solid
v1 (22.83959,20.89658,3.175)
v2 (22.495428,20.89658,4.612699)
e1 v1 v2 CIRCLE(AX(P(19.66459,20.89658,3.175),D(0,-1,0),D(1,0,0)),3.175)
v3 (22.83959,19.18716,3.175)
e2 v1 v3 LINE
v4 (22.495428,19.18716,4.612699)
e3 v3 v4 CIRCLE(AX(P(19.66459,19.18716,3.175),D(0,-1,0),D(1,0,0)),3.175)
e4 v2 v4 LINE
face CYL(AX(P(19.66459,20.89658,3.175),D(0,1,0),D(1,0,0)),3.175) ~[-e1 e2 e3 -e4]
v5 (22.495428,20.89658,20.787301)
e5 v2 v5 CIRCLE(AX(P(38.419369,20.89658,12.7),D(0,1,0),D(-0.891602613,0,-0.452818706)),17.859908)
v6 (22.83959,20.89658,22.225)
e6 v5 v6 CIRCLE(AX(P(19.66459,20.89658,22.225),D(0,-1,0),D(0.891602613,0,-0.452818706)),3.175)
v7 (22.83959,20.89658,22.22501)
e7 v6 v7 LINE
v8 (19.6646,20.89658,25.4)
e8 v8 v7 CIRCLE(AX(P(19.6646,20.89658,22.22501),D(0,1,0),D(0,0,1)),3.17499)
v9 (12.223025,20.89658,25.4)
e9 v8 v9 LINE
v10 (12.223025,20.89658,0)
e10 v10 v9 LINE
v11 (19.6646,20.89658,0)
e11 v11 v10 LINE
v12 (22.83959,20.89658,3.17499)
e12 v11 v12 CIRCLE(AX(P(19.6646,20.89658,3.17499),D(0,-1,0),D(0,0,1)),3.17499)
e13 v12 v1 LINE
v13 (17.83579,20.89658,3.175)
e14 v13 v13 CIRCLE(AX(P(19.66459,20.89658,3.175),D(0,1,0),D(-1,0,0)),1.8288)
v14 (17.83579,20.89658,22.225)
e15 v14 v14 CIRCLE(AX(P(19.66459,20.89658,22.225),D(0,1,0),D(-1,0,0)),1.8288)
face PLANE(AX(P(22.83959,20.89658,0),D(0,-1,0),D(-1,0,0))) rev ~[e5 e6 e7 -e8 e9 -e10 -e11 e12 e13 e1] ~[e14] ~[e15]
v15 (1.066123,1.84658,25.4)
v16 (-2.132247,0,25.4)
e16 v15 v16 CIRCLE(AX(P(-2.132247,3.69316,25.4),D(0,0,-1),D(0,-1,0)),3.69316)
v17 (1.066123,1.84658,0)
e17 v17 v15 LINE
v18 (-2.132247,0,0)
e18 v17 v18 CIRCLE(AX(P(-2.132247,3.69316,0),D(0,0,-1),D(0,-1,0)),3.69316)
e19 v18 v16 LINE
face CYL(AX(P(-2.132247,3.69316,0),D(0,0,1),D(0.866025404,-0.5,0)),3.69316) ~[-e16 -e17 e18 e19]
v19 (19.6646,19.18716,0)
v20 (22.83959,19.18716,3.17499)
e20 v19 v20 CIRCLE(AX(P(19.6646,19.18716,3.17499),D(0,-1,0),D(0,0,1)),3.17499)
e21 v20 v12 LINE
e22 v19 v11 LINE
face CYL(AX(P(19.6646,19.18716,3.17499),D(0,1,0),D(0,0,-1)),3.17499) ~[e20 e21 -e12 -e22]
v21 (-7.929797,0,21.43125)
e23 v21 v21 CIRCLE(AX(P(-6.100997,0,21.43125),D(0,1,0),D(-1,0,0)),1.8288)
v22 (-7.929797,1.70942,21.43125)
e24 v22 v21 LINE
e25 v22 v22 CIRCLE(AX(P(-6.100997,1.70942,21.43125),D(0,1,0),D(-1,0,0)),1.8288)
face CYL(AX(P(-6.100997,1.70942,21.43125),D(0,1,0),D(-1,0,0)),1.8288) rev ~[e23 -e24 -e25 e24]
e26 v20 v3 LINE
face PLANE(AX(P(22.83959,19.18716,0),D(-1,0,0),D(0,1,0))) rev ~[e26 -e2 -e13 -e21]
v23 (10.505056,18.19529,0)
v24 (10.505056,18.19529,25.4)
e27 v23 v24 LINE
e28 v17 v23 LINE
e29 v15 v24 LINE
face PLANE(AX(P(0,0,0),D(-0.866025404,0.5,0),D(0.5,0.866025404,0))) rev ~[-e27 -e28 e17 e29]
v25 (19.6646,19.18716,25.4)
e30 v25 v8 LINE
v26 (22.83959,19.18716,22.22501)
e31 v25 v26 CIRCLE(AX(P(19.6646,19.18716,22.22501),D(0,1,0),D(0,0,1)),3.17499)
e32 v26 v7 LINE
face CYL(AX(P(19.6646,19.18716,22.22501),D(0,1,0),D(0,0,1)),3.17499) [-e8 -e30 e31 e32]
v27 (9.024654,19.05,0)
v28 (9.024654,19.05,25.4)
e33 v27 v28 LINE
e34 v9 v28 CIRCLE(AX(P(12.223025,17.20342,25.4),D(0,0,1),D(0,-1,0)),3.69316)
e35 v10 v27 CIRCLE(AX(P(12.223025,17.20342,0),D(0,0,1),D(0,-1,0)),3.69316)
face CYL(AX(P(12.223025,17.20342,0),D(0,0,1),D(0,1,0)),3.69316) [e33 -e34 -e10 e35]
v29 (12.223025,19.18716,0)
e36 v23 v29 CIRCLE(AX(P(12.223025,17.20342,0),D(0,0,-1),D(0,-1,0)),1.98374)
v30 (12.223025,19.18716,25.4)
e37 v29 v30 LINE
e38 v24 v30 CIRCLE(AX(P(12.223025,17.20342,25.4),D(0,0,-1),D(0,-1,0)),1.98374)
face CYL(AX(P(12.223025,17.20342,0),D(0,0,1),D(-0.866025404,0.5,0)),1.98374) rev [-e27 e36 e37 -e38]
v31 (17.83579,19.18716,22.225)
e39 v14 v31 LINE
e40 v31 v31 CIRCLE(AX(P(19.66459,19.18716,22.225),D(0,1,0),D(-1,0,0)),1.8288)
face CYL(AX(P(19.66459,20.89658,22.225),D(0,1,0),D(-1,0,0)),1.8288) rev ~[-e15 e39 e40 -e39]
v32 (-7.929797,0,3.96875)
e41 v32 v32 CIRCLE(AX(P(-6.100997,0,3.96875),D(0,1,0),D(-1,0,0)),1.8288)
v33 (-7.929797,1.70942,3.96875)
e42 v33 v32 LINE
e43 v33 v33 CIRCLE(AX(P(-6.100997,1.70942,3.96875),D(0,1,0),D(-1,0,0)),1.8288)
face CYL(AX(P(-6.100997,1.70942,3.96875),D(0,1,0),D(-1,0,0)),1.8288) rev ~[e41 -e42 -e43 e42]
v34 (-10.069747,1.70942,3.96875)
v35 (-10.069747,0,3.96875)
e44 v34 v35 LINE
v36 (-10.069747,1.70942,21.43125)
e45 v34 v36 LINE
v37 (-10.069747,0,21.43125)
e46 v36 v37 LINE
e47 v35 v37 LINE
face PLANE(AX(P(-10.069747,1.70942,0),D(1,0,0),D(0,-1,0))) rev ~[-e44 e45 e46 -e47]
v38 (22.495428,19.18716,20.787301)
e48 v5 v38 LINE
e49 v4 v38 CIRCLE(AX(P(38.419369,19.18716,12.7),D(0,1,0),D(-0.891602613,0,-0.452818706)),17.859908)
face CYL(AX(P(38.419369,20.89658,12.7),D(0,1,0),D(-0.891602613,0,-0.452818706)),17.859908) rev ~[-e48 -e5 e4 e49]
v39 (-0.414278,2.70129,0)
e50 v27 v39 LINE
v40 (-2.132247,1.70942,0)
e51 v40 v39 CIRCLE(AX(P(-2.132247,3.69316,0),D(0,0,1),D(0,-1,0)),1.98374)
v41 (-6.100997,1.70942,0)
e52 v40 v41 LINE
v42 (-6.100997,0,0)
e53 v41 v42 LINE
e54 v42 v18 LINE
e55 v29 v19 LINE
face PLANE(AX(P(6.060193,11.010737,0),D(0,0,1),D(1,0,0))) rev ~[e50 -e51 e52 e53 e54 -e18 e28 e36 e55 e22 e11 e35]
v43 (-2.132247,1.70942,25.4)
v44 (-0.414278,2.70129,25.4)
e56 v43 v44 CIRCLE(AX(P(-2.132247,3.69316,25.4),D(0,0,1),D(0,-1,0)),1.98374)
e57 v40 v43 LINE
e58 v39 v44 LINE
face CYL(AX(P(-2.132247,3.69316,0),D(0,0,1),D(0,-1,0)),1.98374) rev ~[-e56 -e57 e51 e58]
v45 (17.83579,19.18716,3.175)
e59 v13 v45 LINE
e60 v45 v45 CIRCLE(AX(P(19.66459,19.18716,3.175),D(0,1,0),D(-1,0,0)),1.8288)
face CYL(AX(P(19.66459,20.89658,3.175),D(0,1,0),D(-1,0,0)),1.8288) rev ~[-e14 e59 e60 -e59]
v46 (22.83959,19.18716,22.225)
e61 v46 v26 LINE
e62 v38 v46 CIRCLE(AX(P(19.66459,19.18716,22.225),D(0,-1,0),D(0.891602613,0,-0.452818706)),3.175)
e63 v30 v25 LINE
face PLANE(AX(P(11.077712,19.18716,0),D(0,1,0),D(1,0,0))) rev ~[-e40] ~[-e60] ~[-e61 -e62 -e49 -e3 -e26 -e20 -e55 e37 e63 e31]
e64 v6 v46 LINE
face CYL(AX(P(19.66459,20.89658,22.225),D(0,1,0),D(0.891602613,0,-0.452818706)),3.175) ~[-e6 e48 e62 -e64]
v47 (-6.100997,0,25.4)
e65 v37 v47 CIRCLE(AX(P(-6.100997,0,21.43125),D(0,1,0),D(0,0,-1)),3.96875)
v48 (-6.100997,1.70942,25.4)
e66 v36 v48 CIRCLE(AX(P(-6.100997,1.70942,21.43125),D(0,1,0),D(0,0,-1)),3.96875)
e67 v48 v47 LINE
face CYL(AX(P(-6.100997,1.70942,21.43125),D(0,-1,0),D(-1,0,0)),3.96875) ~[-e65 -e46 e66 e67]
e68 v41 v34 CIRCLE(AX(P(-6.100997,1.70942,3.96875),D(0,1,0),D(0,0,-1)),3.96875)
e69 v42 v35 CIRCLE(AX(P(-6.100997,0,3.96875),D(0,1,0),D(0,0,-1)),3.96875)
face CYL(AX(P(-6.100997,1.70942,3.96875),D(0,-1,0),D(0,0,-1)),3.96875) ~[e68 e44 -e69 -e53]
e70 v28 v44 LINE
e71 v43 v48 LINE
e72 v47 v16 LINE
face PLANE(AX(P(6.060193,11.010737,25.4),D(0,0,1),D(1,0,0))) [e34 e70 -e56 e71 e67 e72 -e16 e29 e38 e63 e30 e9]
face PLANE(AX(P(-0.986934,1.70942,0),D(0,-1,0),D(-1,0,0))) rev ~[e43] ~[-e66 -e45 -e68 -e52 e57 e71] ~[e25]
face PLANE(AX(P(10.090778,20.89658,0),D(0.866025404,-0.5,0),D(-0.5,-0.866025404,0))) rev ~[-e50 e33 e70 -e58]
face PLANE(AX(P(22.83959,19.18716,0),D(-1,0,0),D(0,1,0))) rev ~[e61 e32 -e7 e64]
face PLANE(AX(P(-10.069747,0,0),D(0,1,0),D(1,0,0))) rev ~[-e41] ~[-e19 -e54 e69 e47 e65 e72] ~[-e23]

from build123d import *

# Parameters (mm, degrees)
F1_DEPTH = 25.4
F2_R     = 1.8288
F3_DEPTH = 1.70942
F4_R     = 1.98374
F5_R     = 3.69316
F6_R     = 3.17499
F7_R     = 3.96875
F8_R     = 1.8288
F9_DEPTH = 1.70942


# Not quite as in the source:
# - a fillet or chamfer is up to 0.001 mm smaller than in the source, because OpenCascade refuses the exact size


with BuildPart() as f1:
    # F0 (on Top) → F1 (new body)
    with BuildSketch(Plane.XY):
        Polygon((-10.0697469202, 0), (0, 0), (11.077711991, 19.18716), (22.839589814, 19.18716), (22.839589814, 20.89658), (10.0907778938, 20.89658), (-0.9869340972, 1.70942), (-10.0697469202, 1.70942), align=None)
    extrude(amount=F1_DEPTH)

    # F2 (on face) → F3 (cut, through all)
    with BuildSketch(Plane(origin=(0, 20.89658, 0), x_dir=(-1, 0, 0), z_dir=(0, 1, 0))):
        with BuildLine():
            ThreePointArc((-22.839589814, 3.175), (-22.752350863, 3.914159458), (-22.4954281104, 4.6126993912))
            ThreePointArc((-22.4954281104, 4.6126993912), (-20.5594607088, 12.7), (-22.4954281104, 20.7873006088))
            ThreePointArc((-22.4954281104, 20.7873006088), (-22.752350863, 21.485840542), (-22.839589814, 22.225))
            Line((-22.839589814, 22.225), (-22.839589814, 3.175))
        make_face()
        with Locations((-19.664589814, 3.175)):
            Circle(F2_R)
        with Locations((-19.664589814, 22.225)):
            Circle(F2_R)
    extrude(amount=-F3_DEPTH, mode=Mode.SUBTRACT)

    # F4
    f4_edges = [f1.edges().sort_by_distance(p)[0] for p in [
        (-0.986934, 1.70942, 12.7),
        (11.077712, 19.18716, 12.7),
    ]]
    fillet(f4_edges, radius=F4_R)

    # F5
    f5_edges = [f1.edges().sort_by_distance(p)[0] for p in [
        (10.090778, 20.89658, 12.7),
        (0, 0, 12.7),
    ]]
    fillet(f5_edges, radius=F5_R)

    # F6 (radius 3.175 in the source; OpenCascade refuses exactly that, so slightly less here)
    f6_edges = [f1.edges().sort_by_distance(p)[0] for p in [
        (22.83959, 20.04187, 25.4),
        (22.83959, 20.04187, 0),
    ]]
    fillet(f6_edges, radius=F6_R)

    # F7
    f7_edges = [f1.edges().sort_by_distance(p)[0] for p in [
        (-10.069747, 0.85471, 25.4),
        (-10.069747, 0.85471, 0),
    ]]
    fillet(f7_edges, radius=F7_R)

    # F8 (on face) → F9 (cut, through all)
    with BuildSketch(Plane(origin=(0, 1.70942, 0), x_dir=(-1, 0, 0), z_dir=(0, 1, 0))):
        with Locations((6.1009969202, 3.96875)):
            Circle(F8_R)
        with Locations((6.1009969202, 21.43125)):
            Circle(F8_R)
    extrude(amount=-F9_DEPTH, mode=Mode.SUBTRACT)


solid = f1.part
